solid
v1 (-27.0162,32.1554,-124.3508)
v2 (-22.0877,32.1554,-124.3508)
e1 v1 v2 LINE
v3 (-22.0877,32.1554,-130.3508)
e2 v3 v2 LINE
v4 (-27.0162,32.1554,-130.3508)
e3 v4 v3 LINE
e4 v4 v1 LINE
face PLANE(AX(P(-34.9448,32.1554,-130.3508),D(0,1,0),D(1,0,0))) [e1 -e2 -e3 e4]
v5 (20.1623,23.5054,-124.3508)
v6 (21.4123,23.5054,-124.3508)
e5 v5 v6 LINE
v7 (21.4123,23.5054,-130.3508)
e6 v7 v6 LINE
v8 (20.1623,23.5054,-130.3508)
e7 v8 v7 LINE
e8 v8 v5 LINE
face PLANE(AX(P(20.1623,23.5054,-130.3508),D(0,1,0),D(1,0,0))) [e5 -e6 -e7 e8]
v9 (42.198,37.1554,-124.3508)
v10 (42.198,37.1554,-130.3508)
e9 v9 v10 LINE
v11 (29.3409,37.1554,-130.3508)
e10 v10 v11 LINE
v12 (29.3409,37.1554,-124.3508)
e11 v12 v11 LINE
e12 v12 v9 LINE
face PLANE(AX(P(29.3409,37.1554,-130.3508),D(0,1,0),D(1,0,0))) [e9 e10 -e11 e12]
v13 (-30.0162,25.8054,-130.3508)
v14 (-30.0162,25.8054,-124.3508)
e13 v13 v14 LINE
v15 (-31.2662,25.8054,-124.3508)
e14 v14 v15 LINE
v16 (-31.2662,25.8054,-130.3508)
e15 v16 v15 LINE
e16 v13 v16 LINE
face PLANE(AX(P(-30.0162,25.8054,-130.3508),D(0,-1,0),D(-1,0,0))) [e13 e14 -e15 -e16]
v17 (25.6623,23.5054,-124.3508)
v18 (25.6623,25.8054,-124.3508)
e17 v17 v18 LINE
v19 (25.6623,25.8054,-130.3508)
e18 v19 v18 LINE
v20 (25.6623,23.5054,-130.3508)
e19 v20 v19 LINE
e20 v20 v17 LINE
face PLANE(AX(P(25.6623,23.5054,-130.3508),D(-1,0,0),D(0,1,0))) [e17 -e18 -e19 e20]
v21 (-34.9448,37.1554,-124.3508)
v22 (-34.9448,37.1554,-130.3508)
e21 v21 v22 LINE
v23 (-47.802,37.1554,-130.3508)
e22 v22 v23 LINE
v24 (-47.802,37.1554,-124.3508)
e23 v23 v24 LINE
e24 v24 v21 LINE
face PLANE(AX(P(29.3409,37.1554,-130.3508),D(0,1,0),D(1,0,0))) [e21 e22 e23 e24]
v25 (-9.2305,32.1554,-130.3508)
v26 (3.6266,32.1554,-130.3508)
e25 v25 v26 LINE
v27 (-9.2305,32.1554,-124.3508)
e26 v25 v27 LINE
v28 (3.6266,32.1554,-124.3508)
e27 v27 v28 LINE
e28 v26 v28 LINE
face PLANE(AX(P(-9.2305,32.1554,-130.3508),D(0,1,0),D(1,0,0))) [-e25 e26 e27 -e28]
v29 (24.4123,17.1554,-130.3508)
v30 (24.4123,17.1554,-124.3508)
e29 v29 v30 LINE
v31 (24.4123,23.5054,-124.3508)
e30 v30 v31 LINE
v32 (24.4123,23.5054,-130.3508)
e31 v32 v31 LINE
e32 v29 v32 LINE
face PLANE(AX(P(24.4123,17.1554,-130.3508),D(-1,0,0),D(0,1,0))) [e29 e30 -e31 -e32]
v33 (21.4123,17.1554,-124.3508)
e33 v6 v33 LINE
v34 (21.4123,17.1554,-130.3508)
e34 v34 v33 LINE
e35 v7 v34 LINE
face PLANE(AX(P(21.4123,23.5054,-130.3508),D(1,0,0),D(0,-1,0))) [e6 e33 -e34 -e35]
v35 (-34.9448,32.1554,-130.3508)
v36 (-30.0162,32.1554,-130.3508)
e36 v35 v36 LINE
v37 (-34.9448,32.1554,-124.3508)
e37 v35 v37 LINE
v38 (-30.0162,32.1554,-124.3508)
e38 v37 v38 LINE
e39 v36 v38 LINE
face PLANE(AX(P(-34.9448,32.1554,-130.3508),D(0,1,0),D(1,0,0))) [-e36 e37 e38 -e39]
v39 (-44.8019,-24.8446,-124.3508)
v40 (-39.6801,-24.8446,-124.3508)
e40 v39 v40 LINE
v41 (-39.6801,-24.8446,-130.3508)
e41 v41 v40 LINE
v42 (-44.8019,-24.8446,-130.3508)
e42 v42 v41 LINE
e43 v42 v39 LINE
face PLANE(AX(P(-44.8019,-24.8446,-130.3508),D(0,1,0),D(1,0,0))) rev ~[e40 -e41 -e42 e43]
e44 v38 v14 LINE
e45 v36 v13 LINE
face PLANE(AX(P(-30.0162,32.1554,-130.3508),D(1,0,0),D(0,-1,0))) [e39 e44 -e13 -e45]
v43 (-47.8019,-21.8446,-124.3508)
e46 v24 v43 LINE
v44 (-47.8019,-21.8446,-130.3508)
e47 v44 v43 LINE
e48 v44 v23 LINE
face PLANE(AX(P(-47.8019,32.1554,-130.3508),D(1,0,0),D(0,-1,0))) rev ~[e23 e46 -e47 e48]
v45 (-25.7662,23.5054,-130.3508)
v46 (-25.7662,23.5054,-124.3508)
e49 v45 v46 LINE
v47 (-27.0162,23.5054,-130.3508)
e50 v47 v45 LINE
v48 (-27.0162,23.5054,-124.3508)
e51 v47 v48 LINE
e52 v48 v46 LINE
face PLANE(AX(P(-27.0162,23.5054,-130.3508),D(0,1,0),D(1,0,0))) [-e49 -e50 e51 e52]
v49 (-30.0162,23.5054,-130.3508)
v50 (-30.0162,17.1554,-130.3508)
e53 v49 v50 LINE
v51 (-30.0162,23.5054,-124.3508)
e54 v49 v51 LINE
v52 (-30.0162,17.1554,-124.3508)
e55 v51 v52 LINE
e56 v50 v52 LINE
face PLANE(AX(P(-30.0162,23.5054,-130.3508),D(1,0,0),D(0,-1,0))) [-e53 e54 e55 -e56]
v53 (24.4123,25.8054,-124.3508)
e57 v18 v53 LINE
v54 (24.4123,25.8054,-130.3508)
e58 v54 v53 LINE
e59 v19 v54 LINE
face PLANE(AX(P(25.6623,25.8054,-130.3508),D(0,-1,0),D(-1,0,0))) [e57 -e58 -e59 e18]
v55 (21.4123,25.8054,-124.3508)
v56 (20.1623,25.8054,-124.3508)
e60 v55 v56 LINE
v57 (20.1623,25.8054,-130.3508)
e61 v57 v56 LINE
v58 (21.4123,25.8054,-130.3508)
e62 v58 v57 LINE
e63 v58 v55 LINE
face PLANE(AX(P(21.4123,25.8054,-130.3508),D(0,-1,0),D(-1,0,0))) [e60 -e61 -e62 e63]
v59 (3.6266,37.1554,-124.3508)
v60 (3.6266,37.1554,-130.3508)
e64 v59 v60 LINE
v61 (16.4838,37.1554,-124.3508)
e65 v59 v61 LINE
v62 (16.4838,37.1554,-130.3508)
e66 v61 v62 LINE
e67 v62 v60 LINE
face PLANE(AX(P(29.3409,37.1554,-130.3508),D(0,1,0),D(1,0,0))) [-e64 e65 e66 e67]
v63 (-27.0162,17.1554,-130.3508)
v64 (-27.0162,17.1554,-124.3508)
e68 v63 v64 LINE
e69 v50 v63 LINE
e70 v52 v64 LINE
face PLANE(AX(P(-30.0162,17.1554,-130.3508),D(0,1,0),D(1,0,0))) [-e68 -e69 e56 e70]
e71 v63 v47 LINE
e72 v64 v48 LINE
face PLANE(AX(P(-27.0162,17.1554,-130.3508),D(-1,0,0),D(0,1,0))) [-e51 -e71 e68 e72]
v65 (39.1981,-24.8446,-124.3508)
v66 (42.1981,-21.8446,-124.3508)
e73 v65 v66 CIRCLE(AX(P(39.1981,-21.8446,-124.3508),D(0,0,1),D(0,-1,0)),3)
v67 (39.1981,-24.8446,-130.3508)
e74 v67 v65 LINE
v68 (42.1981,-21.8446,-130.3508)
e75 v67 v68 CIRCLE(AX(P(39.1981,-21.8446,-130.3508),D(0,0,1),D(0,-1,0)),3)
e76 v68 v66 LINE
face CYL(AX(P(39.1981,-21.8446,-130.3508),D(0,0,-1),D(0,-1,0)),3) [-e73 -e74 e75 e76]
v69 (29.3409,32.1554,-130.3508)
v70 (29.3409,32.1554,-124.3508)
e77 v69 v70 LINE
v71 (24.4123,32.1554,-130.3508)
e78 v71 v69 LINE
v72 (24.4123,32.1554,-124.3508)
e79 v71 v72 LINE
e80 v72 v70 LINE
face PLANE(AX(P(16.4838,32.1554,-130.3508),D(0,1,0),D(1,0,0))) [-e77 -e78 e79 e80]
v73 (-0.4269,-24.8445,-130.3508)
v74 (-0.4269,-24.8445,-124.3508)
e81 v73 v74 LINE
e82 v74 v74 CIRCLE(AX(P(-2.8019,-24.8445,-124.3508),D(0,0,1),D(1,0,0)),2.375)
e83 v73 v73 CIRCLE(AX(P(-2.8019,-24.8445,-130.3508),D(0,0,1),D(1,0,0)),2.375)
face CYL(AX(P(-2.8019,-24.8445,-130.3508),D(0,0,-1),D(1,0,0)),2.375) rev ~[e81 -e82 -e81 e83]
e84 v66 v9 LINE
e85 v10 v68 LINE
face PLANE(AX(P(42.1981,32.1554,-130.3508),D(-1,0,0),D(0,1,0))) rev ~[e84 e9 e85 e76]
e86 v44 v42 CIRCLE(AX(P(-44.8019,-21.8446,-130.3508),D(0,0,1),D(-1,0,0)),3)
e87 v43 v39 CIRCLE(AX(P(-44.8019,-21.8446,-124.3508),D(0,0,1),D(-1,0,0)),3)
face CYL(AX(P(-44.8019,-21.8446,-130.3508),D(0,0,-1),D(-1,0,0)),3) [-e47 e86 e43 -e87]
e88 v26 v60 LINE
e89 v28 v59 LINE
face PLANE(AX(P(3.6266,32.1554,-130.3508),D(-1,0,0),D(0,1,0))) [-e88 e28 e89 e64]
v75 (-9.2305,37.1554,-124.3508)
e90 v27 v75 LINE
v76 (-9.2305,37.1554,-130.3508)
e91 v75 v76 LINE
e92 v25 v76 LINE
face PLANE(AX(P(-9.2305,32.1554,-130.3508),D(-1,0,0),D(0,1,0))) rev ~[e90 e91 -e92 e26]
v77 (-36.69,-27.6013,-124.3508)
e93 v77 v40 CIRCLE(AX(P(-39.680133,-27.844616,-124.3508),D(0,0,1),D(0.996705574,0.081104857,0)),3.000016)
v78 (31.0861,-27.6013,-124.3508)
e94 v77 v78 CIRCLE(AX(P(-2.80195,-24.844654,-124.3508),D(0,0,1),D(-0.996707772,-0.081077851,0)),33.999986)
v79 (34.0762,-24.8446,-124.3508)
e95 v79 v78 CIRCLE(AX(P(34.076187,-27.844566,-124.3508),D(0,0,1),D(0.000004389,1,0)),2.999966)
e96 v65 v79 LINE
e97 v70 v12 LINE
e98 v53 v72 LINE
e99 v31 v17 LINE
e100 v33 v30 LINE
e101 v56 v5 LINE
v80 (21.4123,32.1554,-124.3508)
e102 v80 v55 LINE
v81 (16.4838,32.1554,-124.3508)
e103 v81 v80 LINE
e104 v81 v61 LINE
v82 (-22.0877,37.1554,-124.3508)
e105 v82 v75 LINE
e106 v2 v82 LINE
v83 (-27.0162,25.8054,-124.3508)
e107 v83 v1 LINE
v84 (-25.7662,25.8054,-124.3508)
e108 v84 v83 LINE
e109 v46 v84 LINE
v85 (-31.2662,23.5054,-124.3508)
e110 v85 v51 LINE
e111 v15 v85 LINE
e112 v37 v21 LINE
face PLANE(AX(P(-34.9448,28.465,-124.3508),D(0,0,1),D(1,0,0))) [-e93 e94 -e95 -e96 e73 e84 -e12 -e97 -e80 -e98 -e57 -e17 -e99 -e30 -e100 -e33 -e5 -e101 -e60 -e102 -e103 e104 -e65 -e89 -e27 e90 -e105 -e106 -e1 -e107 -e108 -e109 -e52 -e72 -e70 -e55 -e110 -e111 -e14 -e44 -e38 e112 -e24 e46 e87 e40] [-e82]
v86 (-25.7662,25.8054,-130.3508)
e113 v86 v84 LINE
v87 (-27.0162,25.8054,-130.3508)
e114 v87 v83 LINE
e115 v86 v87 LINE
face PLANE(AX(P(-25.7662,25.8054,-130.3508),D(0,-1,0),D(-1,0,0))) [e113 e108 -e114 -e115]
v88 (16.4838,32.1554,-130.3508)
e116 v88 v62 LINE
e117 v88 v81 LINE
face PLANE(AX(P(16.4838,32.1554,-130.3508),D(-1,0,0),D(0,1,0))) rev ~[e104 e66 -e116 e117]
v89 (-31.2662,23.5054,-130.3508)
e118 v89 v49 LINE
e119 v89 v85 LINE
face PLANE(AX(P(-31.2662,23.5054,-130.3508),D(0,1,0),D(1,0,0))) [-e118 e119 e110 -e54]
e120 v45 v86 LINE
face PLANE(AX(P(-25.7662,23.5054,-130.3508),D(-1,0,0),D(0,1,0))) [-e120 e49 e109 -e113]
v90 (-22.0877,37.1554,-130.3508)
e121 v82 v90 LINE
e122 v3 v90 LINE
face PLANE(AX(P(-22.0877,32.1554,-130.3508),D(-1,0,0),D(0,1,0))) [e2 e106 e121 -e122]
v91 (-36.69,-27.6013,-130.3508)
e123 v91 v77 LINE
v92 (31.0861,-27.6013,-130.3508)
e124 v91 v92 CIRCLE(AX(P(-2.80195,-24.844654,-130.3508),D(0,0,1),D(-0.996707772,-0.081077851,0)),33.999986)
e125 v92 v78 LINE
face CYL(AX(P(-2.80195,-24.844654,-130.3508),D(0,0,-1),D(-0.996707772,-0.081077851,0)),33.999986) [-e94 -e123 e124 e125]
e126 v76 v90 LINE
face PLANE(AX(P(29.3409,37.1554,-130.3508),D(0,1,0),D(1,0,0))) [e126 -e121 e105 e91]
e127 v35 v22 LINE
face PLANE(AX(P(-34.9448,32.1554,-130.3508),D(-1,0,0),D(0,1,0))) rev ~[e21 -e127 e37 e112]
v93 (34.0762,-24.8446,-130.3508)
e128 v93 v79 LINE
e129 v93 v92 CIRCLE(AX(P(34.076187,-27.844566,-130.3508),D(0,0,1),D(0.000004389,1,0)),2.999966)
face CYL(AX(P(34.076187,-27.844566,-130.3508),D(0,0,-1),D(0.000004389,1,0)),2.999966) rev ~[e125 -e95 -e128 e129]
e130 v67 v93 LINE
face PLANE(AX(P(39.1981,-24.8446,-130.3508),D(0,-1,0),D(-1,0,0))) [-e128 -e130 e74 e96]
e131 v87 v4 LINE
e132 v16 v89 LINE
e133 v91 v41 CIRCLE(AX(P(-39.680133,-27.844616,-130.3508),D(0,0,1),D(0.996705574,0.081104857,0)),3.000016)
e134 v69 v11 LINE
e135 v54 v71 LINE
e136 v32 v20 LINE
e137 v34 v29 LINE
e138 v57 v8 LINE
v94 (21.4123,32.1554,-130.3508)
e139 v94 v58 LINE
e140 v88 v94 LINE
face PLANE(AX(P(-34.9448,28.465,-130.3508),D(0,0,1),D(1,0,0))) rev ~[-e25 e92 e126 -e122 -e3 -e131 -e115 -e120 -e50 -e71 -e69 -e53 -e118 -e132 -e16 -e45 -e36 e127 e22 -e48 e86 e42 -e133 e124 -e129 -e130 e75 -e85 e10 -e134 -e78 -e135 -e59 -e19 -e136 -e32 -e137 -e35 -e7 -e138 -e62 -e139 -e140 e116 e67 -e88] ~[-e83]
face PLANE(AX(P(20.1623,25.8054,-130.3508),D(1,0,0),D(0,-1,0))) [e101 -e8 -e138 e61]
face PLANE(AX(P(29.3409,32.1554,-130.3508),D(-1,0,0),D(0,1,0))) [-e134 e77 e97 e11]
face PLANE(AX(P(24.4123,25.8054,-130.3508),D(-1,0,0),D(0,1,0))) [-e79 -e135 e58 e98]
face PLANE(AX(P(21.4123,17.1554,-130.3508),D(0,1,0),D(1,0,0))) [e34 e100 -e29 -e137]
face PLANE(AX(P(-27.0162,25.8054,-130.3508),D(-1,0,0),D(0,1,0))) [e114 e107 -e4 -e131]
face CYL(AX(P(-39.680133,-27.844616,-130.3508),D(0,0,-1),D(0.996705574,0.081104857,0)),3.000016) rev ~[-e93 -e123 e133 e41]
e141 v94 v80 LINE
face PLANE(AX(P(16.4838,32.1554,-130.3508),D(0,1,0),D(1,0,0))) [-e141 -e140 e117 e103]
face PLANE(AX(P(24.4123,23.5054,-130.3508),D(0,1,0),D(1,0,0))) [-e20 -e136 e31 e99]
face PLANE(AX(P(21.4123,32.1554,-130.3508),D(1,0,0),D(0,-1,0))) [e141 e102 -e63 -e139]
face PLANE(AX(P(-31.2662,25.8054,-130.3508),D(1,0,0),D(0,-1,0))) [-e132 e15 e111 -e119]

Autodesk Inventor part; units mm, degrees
ref_plane "YZ Plane" through (0, 0, 0) normal (1, 0, 0) x (0, 1, 0)
ref_plane "XZ Plane" through (0, 0, 0) normal (0, 1, 0) x (-1, 0, 0)
ref_plane "РабПлоскость1" through (-34.9448, 28.465, -130.3508) normal (0, 0, 1) x (1, 0, 0)
ref_plane "РабПлоскость2" through (-162.802, 331.465, 111.3492) normal (0, 0, 1) x (1, 0, 0)
sketch "Эскиз1" plane through (-34.9448, 28.465, -130.3508) normal (0, 0, 1) x (1, 0, 0)
  line L0 (0, 3.6904) -> (-12.8571, 3.6904) construction
  line L1 (0, 3.6904) -> (0, 9.6905) projected
  line L2 (-12.8571, 9.6905) -> (0, 9.6905) projected
  line L3 (-12.8571, 3.6904) -> (-12.8571, 9.6905) projected
  line L4 (25.7143, 3.6904) -> (12.8571, 3.6904) construction
  line L5 (25.7143, 3.6904) -> (25.7143, 9.6905) projected
  line L6 (12.8571, 9.6905) -> (25.7143, 9.6905) projected
  line L7 (12.8571, 3.6904) -> (12.8571, 9.6905) projected
  line L8 (51.4286, 3.6904) -> (38.5714, 3.6904) construction
  line L9 (51.4286, 3.6904) -> (51.4286, 9.6905) projected
  line L10 (38.5714, 9.6905) -> (51.4286, 9.6905) projected
  line L11 (38.5714, 3.6904) -> (38.5714, 9.6905) projected
  line L12 (77.1429, 3.6904) -> (64.2857, 3.6904) construction
  line L13 (77.1429, 3.6904) -> (77.1429, 9.6905) projected
  line L14 (64.2857, 9.6905) -> (77.1429, 9.6905) projected
  line L15 (64.2857, 3.6904) -> (64.2857, 9.6905) projected
  line L16 (0, 3.6904) -> (12.8571, 3.6904)
  line L17 (25.7143, 3.6904) -> (38.5714, 3.6904)
  line L18 (51.4286, 3.6904) -> (64.2857, 3.6904)
  line L19 (-12.8571, 3.6904) -> (-12.8571, -50.3096)
  line L20 (-9.8571, -53.3096) -> (-4.7353, -53.3096)
  line L21 (77.1429, 3.6904) -> (77.1429, -50.3096)
  line L22 (74.1429, -53.3096) -> (69.021, -53.3096)
  line L23 (-1.8571, -53.3096) -> (66.1429, -53.3096) construction
  arc A0 (-1.7452, -56.0663) -> (66.0309, -56.0663) centre (32.1429, -53.3096) ccw
  arc A1 (-1.7452, -56.0663) -> (-4.7353, -53.3096) centre (-4.7353, -56.3096) ccw
  arc A2 (69.021, -53.3096) -> (66.0309, -56.0663) centre (69.021, -56.3096) ccw
  arc A3 (74.1429, -53.3096) -> (77.1429, -50.3096) centre (74.1429, -50.3096) ccw
  arc A4 (-12.8571, -50.3096) -> (-9.8571, -53.3096) centre (-9.8571, -50.3096) ccw
  circle A5 centre (32.1429, -53.3095) radius 2.375
  point P0 (34.9448, -28.465)
  point P1 (77.1429, -53.3096)
  dimension "d0" = 57
  dimension "d1" = 34
  dimension "d2" = 3
  dimension "d3" = 6
  dimension "d14" = 4.75
extrude "Выдавливание1" add sketch "Эскиз1" along normal blind 6
sketch "Эскиз2" plane through (-34.9448, 28.465, -130.3508) normal (0, 0, -1) x (-1, 0, 0)
  line L0 (-4.9286, 3.6904) -> (-4.9286, -2.6596)
  line L1 (-4.9286, -2.6596) -> (-3.6786, -2.6596)
  line L2 (-3.6786, -2.6596) -> (-3.6786, -4.9596)
  line L3 (-3.6786, -4.9596) -> (-4.9286, -4.9596)
  line L4 (-4.9286, -4.9596) -> (-4.9286, -11.3096)
  line L5 (-4.9286, -11.3096) -> (-7.9286, -11.3096)
  line L6 (-7.9286, -11.3096) -> (-7.9286, -4.9596)
  line L7 (-7.9286, -4.9596) -> (-9.1786, -4.9596)
  line L8 (-9.1786, -4.9596) -> (-9.1786, -2.6596)
  line L9 (-9.1786, -2.6596) -> (-7.9286, -2.6596)
  line L10 (-7.9286, -2.6596) -> (-7.9286, 3.6904)
  line L11 (-56.3571, 3.6904) -> (-59.3571, 3.6904)
  line L12 (-56.3571, 3.6904) -> (-56.3571, -2.6596)
  line L13 (-56.3571, -2.6596) -> (-55.1071, -2.6596)
  line L14 (-55.1071, -2.6596) -> (-55.1071, -4.9596)
  line L15 (-55.1071, -4.9596) -> (-56.3571, -4.9596)
  line L16 (-56.3571, -4.9596) -> (-56.3571, -11.3096)
  line L17 (-56.3571, -11.3096) -> (-59.3571, -11.3096)
  line L18 (-59.3571, -11.3096) -> (-59.3571, -4.9596)
  line L19 (-59.3571, -4.9596) -> (-60.6071, -4.9596)
  line L20 (-60.6071, -4.9596) -> (-60.6071, -2.6596)
  line L21 (-60.6071, -2.6596) -> (-59.3571, -2.6596)
  line L22 (-59.3571, -2.6596) -> (-59.3571, 3.6904)
  line L23 (-56.3571, 3.6904) -> (-59.3571, 3.6904) projected
  line L24 (-4.9286, 3.6904) -> (-7.9286, 3.6904) projected
  point P0 (-34.9448, -28.465)
  point P1 (-6.4286, 0)
  dimension "d9" = 5.5
  dimension "d10" = 2.3
  dimension "d11" = 15
extrude "Выдавливание2" cut sketch "Эскиз2" against normal blind 6
sketch "Эскиз4" plane through (29.3409, 38.1554, -130.3508) normal (0, 1, 0) x (1, 0, 0)
  line L0 (-77.1429, 0) -> (-77.1429, -6) projected
  line L1 (12.8571, 0) -> (-77.1429, 0)
  line L2 (-77.1429, 0) -> (-77.1429, -6)
  line L3 (-77.1429, -6) -> (12.8571, -6)
  line L4 (12.8571, -6) -> (12.8571, 0)
  point P0 (-29.3409, -130.3508)
extrude "Выдавливание3" cut sketch "Эскиз4" against normal blind 1
equation "\"d4\" = d3"
equation "\"d12\" = d3"
properties part number "wheel1"
